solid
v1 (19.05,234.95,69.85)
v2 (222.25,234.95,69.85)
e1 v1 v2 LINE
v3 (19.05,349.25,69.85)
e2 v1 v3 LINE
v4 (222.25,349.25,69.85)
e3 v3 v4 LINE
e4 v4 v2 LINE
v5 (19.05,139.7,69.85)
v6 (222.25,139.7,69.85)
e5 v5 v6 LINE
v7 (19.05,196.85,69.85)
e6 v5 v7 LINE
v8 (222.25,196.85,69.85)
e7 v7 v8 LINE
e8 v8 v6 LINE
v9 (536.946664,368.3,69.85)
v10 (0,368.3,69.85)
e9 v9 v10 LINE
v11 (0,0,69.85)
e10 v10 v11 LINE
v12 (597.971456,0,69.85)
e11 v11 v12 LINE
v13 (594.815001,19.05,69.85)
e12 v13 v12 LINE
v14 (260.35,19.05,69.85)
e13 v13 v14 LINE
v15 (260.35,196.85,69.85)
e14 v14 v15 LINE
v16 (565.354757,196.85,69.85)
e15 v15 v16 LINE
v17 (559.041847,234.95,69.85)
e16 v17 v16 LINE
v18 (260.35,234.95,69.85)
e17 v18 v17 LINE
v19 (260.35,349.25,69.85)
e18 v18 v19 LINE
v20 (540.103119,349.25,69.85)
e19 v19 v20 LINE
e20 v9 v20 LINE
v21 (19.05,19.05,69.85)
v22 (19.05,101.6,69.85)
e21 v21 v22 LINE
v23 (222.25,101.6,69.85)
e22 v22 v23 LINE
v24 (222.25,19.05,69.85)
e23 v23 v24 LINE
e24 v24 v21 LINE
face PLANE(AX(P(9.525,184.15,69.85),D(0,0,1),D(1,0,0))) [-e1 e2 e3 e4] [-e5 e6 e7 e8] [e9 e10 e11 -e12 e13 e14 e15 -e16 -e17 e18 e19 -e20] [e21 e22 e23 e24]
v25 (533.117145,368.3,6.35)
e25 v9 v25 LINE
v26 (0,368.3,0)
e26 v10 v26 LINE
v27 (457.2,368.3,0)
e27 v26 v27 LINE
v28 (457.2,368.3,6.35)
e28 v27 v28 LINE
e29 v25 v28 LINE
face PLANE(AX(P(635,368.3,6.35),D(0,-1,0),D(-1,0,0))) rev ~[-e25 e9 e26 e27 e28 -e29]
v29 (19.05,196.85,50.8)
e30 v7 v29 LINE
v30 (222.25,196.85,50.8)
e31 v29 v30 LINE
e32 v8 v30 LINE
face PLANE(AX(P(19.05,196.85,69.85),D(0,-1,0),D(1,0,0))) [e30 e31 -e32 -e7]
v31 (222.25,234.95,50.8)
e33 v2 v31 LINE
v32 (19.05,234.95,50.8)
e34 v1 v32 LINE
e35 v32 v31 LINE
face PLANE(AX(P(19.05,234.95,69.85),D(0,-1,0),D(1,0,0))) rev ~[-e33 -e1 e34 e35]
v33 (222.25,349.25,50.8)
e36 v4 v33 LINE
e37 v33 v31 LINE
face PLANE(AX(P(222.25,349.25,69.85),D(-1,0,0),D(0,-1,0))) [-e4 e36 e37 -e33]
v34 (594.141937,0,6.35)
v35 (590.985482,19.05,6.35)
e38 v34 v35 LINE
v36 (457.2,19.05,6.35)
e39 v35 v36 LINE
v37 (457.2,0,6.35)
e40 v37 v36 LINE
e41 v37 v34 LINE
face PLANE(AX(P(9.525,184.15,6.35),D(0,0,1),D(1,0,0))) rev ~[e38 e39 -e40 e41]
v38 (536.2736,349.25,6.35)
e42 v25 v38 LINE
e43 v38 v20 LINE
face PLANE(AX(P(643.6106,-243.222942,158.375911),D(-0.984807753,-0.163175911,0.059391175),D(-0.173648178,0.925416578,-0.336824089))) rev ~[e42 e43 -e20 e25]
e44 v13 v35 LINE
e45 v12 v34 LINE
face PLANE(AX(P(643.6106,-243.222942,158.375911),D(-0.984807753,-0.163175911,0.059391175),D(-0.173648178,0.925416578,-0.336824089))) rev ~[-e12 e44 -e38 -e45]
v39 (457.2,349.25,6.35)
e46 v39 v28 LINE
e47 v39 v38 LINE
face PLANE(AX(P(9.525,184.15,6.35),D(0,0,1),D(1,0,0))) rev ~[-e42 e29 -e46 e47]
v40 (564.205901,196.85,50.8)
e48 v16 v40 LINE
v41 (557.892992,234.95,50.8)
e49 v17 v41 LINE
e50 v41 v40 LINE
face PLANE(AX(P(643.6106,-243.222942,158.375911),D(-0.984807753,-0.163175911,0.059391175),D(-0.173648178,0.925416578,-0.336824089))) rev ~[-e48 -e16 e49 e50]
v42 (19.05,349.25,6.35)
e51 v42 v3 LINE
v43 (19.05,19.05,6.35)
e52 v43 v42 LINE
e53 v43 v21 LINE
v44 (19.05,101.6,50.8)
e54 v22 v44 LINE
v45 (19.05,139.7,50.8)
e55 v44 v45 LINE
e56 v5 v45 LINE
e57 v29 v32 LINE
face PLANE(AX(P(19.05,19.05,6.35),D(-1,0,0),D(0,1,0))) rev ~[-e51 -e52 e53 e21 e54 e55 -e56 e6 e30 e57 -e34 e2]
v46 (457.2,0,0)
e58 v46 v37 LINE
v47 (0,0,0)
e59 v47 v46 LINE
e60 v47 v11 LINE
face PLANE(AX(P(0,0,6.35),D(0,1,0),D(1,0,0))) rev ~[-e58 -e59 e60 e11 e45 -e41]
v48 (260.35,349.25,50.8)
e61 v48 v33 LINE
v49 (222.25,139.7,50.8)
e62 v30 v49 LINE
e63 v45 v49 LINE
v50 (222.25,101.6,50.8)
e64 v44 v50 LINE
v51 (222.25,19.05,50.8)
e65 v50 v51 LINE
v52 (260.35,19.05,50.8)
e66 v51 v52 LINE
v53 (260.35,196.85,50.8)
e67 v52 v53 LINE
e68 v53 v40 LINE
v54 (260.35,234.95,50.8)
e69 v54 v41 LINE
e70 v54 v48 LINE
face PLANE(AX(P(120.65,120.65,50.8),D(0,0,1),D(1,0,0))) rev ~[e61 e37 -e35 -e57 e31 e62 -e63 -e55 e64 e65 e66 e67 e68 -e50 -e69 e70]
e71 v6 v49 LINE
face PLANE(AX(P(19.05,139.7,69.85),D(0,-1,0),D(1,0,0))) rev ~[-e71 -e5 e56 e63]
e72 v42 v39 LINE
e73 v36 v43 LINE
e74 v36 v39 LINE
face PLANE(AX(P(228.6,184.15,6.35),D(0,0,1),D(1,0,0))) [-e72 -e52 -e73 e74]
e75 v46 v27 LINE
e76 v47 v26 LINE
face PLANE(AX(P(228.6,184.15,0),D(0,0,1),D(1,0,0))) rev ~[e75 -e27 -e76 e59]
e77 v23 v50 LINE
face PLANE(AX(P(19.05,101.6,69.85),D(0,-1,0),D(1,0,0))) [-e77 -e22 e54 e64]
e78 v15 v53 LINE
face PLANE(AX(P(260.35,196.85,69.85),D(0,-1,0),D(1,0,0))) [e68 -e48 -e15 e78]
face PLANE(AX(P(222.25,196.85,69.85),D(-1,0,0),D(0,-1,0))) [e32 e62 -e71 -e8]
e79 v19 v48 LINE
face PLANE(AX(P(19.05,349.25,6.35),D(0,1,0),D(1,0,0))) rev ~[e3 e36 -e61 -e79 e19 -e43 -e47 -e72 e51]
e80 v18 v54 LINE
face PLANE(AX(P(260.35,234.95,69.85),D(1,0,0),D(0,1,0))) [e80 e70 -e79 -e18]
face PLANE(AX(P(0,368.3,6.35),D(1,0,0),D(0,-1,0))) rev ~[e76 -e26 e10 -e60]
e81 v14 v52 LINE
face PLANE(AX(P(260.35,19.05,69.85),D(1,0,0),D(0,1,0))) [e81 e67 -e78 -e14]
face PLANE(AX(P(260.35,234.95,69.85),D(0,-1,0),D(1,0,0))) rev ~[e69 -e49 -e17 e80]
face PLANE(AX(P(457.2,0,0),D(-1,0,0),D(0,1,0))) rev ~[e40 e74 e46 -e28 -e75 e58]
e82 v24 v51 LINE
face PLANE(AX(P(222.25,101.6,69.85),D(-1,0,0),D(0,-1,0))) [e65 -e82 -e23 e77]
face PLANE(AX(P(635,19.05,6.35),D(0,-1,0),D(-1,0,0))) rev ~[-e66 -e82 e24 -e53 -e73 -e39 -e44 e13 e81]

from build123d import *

# Parameters (mm, degrees)
F0_W          = 457.2
F0_H          = 368.3
F1_DEPTH      = 6.35
F2_W          = 19.05
F2_H          = 330.2
F2_W_2        = 177.8
F2_H_2        = 19.05
F3_DEPTH      = 63.5
F4_W          = 203.2
F4_H          = 38.1
F4_W_2        = 374.65
F5_DEPTH      = 19.05
F8_DEPTH      = 125.9670187868
F8_DEPTH_BACK = 65.6385295619


# Not quite as in the source:
# - a feature names something its author has since deleted; it is built from what else it names


with BuildPart() as f1:
    # F0 (on Top) → F1 (new body)
    with BuildSketch(Plane.XY):
        with Locations((228.6, 184.15)):
            Rectangle(F0_W, F0_H)
    extrude(amount=F1_DEPTH)

    # F2 (on face) → F3 (join)
    with BuildSketch(Plane.XY.offset(6.35)):
        with Locations((9.525, 184.15)):
            Rectangle(F2_W, F2_H)
        Polygon((0, 368.3), (0, 349.25), (19.05, 349.25), (457.2, 349.25), (457.2, 368.3), align=None)
        Polygon((0, 19.05), (0, 0), (457.2, 0), (457.2, 19.05), (19.05, 19.05), align=None)
        with Locations((546.1, 9.525)):
            Rectangle(F2_W_2, F2_H_2)
        with Locations((546.1, 358.775)):
            Rectangle(F2_W_2, F2_H_2)
    extrude(amount=F3_DEPTH)

    # F4 (on face) → F5 (join)
    with BuildSketch(Plane.XY.offset(69.85)):
        with Locations((120.65, 120.65)):
            Rectangle(F4_W, F4_H)
        Polygon((222.25, 101.6), (222.25, 19.05), (260.35, 19.05), (260.35, 196.85), (260.35, 234.95), (260.35, 349.25), (222.25, 349.25), (222.25, 234.95), (222.25, 196.85), (222.25, 139.7), align=None)
        with Locations((120.65, 215.9)):
            Rectangle(F4_W, F4_H)
        with Locations((447.675, 215.9)):
            Rectangle(F4_W_2, F4_H)
    extrude(amount=-F5_DEPTH)

    # F7 (on face) → F8 (cut, two sides)
    with BuildSketch(Plane(origin=(0, 22.4493572683, 61.6791021759), x_dir=(1, 0, 0), z_dir=(0, -0.3420201433, -0.9396926208))) as f8_sk:
        Polygon((643.6106, 282.7225558054), (513.744137013, -453.7867547107), (643.6106, -453.7867547107), align=None)
    extrude(amount=-F8_DEPTH, mode=Mode.SUBTRACT)
    extrude(f8_sk.sketch, amount=F8_DEPTH_BACK, mode=Mode.SUBTRACT)


solid = f1.part
